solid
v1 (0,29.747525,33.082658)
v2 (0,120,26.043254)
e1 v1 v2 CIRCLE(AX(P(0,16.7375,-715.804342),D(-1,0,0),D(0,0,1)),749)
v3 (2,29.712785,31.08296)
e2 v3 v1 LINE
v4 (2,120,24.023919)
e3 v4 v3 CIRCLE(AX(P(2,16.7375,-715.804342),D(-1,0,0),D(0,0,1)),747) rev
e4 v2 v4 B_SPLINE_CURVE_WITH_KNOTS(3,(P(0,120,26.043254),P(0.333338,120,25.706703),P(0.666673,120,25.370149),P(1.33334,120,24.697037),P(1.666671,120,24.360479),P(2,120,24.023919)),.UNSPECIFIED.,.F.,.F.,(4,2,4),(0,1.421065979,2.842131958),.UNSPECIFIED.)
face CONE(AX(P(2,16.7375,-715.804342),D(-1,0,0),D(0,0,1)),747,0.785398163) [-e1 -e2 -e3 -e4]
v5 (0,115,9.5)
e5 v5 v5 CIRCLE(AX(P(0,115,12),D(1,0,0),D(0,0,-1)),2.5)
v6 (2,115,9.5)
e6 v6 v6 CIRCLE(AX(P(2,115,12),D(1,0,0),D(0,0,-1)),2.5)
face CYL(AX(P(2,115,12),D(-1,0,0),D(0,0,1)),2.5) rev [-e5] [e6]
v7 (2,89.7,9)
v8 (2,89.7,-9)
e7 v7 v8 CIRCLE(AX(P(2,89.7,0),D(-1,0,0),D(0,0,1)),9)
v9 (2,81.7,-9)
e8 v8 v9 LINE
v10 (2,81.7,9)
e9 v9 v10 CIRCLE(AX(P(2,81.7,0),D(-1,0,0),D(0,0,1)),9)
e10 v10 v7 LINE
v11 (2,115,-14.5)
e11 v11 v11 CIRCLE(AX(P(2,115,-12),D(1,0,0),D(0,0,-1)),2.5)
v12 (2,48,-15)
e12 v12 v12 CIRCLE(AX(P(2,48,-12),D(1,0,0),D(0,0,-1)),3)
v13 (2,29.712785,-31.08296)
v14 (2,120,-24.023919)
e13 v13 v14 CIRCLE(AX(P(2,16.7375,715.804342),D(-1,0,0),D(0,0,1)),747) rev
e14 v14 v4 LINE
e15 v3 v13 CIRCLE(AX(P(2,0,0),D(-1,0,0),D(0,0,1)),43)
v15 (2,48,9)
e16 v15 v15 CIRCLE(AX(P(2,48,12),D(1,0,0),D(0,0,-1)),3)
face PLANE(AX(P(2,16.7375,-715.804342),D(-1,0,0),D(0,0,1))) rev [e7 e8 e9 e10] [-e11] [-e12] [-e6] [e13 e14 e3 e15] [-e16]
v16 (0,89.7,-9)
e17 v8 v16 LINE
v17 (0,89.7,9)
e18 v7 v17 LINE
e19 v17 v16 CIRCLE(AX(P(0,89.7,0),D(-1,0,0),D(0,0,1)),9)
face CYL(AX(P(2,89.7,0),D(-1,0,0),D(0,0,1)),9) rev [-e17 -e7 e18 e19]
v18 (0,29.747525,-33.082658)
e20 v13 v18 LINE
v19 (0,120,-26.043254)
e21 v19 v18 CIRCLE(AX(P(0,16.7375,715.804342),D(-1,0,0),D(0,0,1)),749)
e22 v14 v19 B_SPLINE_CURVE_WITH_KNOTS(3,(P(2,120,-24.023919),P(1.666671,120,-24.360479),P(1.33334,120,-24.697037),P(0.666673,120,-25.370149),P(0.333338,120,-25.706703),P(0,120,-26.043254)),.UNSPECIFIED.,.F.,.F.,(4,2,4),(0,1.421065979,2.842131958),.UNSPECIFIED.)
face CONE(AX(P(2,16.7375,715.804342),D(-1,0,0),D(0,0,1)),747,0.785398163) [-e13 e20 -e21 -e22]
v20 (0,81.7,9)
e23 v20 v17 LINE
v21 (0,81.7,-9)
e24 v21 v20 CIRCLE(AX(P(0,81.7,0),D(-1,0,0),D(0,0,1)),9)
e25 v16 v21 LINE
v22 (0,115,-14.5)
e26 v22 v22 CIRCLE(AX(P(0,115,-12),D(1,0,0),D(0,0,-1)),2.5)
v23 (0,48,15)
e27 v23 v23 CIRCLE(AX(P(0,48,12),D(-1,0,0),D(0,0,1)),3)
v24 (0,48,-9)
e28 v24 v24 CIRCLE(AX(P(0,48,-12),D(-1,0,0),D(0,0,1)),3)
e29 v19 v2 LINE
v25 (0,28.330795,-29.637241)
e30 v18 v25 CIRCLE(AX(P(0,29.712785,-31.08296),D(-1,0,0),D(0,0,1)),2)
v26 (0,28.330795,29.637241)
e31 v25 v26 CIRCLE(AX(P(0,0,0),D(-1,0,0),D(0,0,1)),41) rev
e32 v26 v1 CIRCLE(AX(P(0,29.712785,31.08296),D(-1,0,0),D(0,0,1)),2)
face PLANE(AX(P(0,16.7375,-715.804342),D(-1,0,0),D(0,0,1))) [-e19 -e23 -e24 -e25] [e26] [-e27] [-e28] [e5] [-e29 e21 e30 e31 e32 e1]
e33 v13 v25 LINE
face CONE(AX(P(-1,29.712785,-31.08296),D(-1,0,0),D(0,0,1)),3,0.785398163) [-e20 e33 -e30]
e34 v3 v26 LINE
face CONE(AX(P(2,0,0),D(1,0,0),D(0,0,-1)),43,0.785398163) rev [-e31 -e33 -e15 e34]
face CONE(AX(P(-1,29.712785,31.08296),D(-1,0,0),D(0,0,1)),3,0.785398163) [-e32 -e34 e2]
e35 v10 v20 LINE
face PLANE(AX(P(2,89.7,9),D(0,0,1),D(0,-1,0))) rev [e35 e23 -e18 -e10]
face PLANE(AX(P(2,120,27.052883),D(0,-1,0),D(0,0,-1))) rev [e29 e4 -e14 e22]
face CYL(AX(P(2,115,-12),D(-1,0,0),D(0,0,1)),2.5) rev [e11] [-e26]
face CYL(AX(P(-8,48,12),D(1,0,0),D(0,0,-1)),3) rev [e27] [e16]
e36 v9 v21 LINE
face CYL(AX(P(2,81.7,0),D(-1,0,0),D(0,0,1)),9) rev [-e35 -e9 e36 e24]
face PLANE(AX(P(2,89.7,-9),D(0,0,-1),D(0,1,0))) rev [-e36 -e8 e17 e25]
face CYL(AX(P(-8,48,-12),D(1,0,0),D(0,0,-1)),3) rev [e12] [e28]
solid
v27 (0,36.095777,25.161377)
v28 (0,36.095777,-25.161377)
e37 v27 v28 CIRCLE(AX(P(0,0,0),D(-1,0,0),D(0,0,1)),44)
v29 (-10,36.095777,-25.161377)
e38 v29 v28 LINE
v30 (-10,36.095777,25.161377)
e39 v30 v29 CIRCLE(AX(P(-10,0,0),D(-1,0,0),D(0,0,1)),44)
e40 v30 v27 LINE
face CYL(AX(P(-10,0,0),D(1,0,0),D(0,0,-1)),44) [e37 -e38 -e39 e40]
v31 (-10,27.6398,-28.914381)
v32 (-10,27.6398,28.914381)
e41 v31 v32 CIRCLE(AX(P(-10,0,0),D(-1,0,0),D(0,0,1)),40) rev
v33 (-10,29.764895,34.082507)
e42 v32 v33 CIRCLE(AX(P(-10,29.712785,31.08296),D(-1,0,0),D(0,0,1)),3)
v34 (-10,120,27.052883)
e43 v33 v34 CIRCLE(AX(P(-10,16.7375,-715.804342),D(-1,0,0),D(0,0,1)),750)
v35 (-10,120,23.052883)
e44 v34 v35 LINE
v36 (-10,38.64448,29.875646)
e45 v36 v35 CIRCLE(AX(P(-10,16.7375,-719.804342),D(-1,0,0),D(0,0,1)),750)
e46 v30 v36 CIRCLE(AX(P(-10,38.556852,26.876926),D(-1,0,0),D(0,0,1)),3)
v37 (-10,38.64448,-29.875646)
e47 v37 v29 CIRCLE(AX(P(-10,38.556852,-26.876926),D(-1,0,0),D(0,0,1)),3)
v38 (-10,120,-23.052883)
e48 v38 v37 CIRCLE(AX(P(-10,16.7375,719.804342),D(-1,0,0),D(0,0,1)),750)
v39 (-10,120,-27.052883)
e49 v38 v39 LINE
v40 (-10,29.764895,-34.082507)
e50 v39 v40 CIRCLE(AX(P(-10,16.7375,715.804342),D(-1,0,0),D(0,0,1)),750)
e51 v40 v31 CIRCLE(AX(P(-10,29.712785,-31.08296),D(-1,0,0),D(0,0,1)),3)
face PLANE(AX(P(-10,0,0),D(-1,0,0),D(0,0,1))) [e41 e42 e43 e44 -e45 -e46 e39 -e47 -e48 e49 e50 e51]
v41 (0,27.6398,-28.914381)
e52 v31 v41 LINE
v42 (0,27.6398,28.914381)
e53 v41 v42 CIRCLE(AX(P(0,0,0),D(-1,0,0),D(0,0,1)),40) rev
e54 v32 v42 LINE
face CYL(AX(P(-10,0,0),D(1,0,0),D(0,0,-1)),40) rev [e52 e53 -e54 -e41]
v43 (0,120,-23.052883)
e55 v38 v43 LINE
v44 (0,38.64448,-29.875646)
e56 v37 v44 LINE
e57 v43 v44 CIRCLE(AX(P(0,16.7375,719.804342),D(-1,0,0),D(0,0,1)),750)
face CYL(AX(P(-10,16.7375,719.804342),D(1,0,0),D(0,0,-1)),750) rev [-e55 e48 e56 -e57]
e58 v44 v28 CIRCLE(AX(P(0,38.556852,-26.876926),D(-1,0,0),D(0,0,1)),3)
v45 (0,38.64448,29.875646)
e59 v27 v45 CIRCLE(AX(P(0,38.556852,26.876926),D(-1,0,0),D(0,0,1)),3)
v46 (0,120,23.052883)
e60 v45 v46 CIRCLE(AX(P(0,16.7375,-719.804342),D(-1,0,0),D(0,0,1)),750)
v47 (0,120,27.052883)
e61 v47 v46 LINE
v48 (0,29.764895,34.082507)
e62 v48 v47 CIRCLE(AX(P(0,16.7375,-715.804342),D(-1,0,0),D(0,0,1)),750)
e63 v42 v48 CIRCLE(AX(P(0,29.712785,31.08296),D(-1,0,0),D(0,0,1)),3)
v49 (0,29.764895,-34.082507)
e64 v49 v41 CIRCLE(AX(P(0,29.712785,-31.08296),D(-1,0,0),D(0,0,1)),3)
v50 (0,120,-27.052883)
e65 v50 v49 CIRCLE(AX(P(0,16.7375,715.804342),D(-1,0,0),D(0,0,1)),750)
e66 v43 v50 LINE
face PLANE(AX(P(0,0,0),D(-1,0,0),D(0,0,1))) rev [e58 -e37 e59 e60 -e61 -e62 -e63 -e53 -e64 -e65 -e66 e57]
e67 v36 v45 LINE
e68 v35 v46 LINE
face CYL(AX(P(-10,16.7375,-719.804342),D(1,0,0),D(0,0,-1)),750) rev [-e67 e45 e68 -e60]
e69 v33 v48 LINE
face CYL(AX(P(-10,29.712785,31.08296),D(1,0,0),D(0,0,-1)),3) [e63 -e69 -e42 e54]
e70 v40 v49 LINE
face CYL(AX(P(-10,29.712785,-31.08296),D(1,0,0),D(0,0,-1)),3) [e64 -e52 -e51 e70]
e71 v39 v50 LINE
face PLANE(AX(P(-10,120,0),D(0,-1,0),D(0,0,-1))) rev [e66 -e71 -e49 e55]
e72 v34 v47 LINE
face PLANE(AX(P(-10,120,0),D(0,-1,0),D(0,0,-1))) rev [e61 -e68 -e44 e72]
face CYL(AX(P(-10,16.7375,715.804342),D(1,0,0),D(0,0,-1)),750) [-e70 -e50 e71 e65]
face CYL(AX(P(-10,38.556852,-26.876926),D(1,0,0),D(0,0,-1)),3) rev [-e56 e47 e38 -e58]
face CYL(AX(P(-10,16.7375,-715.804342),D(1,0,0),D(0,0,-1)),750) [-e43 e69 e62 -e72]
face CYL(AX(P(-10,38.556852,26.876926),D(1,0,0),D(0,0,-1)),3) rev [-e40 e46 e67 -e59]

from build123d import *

# Parameters (mm, degrees)
SKETCH1_R           = 2.5
BOSS_EXTRUDE1_DEPTH = 2
CUT_EXTRUDE1_DEPTH  = 2
BOSS_EXTRUDE3_DEPTH = 10
SKETCH5_R           = 3
CUT_EXTRUDE2_DEPTH  = 10
CHAMFER4_SIZE       = 3


with BuildPart() as part:
    # Sketch1 → Boss-Extrude1 (new body)
    with BuildSketch(Plane(origin=(0, 0, 0), x_dir=(0, 0, -1), z_dir=(1, 0, 0))):
        with BuildLine():
            Line((-27.052882521, 120), (27.052882521, 120))
            ThreePointArc((27.052882521, 120), (31.930110278, 74.988584163), (34.08250741, 29.764894653))
            ThreePointArc((34.08250741, 29.764894653), (32.223851782, 26.938192137), (28.914381406, 27.63980007))
            ThreePointArc((28.914381406, 27.63980007), (0, 40), (-28.914381406, 27.63980007))
            ThreePointArc((-28.914381406, 27.63980007), (-32.223851782, 26.938192137), (-34.08250741, 29.764894653))
            ThreePointArc((-34.08250741, 29.764894653), (-31.930110278, 74.988584163), (-27.052882521, 120))
        make_face()
        with Locations((-12, 115)):
            Circle(SKETCH1_R, mode=Mode.SUBTRACT)
        with Locations((12, 115)):
            Circle(SKETCH1_R, mode=Mode.SUBTRACT)
    extrude(amount=BOSS_EXTRUDE1_DEPTH)

    # Sketch2 → Cut-Extrude1 (cut)
    with BuildSketch(Plane.ZY):
        with BuildLine():
            Line((9, 89.7), (9, 81.7))
            ThreePointArc((9, 81.7), (0, 72.7), (-9, 81.7))
            Line((-9, 81.7), (-9, 89.7))
            ThreePointArc((-9, 89.7), (0, 98.7), (9, 89.7))
        make_face()
    extrude(amount=-CUT_EXTRUDE1_DEPTH, mode=Mode.SUBTRACT)

    # Sketch5 → Cut-Extrude2 (cut)
    with BuildSketch(Plane(origin=(2, 0, 0), x_dir=(0, 0, -1), z_dir=(1, 0, 0))):
        with Locations((-12, 48)):
            Circle(SKETCH5_R)
        with Locations((12, 48)):
            Circle(SKETCH5_R)
    extrude(amount=-CUT_EXTRUDE2_DEPTH, mode=Mode.SUBTRACT)

    # Chamfer4
    # the kernel refuses this chamfer: 3 mm, written as the material it takes off along each edge
    with BuildSketch(Plane(origin=(2, 16.7375, 715.804342047), x_dir=(0, 0.14786465744034102, -0.9890076051679535), z_dir=(0, 0.9890076051679535, 0.14786465744034102))) as chamfer4_piece_1:
        Polygon((750, CHAMFER4_SIZE), (750 - CHAMFER4_SIZE, 0), (750, 0), align=None)
    revolve(axis=Axis((2, 16.7375, 715.804342047), (-1, 0, 0)), revolution_arc=7.507930855, mode=Mode.SUBTRACT)
    with BuildSketch(Plane(origin=(2, 29.712785075, -31.082960012), x_dir=(0, 0.01736985953789309, -0.9998491326093322), z_dir=(0, 0.9998491326093322, 0.01736985953789309))) as chamfer4_piece_2:
        Polygon((3 - CHAMFER4_SIZE, 0), (3, CHAMFER4_SIZE), (3, 0), align=None)
    revolve(axis=Axis((2, 29.712785075, -31.082960012), (-1, 0, 0)), revolution_arc=137.286346121, mode=Mode.SUBTRACT)
    with BuildSketch(Plane(origin=(2, 0, 0), x_dir=(0, 0.6909950017388863, -0.7228595351601006), z_dir=(0, -0.7228595351601006, -0.6909950017388863))) as chamfer4_piece_3:
        Polygon((40 + CHAMFER4_SIZE, 0), (40, -CHAMFER4_SIZE), (40, 0), align=None)
    revolve(axis=Axis((2, 0, 0), (1, 0, 0)), revolution_arc=92.582152855, mode=Mode.SUBTRACT)
    with BuildSketch(Plane(origin=(2, 29.712785075, 31.082960012), x_dir=(0, -0.6909950017388667, -0.7228595351601192), z_dir=(0, 0.7228595351601192, -0.6909950017388667))) as chamfer4_piece_4:
        Polygon((3 - CHAMFER4_SIZE, 0), (3, CHAMFER4_SIZE), (3, 0), align=None)
    revolve(axis=Axis((2, 29.712785075, 31.082960012), (-1, 0, 0)), revolution_arc=137.286346121, mode=Mode.SUBTRACT)
    with BuildSketch(Plane(origin=(2, 16.7375, -715.804342047), x_dir=(0, 0.017369859537853687, 0.9998491326093328), z_dir=(0, -0.9998491326093328, 0.017369859537853687))) as chamfer4_piece_5:
        Polygon((750, CHAMFER4_SIZE), (750 - CHAMFER4_SIZE, 0), (750, 0), align=None)
    revolve(axis=Axis((2, 16.7375, -715.804342047), (-1, 0, 0)), revolution_arc=7.507930855, mode=Mode.SUBTRACT)


with BuildPart() as body_2:
    # Sketch4 → Boss-Extrude3 (new body)
    with BuildSketch(Plane.ZY):
        with BuildLine():
            Line((-27.052882521, 120), (-23.052882521, 120))
            ThreePointArc((-23.052882521, 120), (-27.572077693, 79.415145268), (-29.875645827, 38.644480171))
            ThreePointArc((-29.875645827, 38.644480171), (-28.303672095, 35.917838187), (-25.161377416, 36.095776575))
            ThreePointArc((-25.161377416, 36.095776575), (0, 44), (25.161377416, 36.095776575))
            ThreePointArc((25.161377416, 36.095776575), (28.303672095, 35.917838187), (29.875645827, 38.644480171))
            ThreePointArc((29.875645827, 38.644480171), (27.572077693, 79.415145268), (23.052882521, 120))
            Line((23.052882521, 120), (27.052882521, 120))
            ThreePointArc((27.052882521, 120), (31.930110278, 74.988584163), (34.08250741, 29.764894653))
            ThreePointArc((34.08250741, 29.764894653), (32.223851782, 26.938192137), (28.914381406, 27.63980007))
            ThreePointArc((28.914381406, 27.63980007), (0, 40), (-28.914381406, 27.63980007))
            ThreePointArc((-28.914381406, 27.63980007), (-32.223851782, 26.938192137), (-34.08250741, 29.764894653))
            ThreePointArc((-34.08250741, 29.764894653), (-31.930110278, 74.988584163), (-27.052882521, 120))
        make_face()
    extrude(amount=BOSS_EXTRUDE3_DEPTH)


solid = Compound([part.part, body_2.part])
